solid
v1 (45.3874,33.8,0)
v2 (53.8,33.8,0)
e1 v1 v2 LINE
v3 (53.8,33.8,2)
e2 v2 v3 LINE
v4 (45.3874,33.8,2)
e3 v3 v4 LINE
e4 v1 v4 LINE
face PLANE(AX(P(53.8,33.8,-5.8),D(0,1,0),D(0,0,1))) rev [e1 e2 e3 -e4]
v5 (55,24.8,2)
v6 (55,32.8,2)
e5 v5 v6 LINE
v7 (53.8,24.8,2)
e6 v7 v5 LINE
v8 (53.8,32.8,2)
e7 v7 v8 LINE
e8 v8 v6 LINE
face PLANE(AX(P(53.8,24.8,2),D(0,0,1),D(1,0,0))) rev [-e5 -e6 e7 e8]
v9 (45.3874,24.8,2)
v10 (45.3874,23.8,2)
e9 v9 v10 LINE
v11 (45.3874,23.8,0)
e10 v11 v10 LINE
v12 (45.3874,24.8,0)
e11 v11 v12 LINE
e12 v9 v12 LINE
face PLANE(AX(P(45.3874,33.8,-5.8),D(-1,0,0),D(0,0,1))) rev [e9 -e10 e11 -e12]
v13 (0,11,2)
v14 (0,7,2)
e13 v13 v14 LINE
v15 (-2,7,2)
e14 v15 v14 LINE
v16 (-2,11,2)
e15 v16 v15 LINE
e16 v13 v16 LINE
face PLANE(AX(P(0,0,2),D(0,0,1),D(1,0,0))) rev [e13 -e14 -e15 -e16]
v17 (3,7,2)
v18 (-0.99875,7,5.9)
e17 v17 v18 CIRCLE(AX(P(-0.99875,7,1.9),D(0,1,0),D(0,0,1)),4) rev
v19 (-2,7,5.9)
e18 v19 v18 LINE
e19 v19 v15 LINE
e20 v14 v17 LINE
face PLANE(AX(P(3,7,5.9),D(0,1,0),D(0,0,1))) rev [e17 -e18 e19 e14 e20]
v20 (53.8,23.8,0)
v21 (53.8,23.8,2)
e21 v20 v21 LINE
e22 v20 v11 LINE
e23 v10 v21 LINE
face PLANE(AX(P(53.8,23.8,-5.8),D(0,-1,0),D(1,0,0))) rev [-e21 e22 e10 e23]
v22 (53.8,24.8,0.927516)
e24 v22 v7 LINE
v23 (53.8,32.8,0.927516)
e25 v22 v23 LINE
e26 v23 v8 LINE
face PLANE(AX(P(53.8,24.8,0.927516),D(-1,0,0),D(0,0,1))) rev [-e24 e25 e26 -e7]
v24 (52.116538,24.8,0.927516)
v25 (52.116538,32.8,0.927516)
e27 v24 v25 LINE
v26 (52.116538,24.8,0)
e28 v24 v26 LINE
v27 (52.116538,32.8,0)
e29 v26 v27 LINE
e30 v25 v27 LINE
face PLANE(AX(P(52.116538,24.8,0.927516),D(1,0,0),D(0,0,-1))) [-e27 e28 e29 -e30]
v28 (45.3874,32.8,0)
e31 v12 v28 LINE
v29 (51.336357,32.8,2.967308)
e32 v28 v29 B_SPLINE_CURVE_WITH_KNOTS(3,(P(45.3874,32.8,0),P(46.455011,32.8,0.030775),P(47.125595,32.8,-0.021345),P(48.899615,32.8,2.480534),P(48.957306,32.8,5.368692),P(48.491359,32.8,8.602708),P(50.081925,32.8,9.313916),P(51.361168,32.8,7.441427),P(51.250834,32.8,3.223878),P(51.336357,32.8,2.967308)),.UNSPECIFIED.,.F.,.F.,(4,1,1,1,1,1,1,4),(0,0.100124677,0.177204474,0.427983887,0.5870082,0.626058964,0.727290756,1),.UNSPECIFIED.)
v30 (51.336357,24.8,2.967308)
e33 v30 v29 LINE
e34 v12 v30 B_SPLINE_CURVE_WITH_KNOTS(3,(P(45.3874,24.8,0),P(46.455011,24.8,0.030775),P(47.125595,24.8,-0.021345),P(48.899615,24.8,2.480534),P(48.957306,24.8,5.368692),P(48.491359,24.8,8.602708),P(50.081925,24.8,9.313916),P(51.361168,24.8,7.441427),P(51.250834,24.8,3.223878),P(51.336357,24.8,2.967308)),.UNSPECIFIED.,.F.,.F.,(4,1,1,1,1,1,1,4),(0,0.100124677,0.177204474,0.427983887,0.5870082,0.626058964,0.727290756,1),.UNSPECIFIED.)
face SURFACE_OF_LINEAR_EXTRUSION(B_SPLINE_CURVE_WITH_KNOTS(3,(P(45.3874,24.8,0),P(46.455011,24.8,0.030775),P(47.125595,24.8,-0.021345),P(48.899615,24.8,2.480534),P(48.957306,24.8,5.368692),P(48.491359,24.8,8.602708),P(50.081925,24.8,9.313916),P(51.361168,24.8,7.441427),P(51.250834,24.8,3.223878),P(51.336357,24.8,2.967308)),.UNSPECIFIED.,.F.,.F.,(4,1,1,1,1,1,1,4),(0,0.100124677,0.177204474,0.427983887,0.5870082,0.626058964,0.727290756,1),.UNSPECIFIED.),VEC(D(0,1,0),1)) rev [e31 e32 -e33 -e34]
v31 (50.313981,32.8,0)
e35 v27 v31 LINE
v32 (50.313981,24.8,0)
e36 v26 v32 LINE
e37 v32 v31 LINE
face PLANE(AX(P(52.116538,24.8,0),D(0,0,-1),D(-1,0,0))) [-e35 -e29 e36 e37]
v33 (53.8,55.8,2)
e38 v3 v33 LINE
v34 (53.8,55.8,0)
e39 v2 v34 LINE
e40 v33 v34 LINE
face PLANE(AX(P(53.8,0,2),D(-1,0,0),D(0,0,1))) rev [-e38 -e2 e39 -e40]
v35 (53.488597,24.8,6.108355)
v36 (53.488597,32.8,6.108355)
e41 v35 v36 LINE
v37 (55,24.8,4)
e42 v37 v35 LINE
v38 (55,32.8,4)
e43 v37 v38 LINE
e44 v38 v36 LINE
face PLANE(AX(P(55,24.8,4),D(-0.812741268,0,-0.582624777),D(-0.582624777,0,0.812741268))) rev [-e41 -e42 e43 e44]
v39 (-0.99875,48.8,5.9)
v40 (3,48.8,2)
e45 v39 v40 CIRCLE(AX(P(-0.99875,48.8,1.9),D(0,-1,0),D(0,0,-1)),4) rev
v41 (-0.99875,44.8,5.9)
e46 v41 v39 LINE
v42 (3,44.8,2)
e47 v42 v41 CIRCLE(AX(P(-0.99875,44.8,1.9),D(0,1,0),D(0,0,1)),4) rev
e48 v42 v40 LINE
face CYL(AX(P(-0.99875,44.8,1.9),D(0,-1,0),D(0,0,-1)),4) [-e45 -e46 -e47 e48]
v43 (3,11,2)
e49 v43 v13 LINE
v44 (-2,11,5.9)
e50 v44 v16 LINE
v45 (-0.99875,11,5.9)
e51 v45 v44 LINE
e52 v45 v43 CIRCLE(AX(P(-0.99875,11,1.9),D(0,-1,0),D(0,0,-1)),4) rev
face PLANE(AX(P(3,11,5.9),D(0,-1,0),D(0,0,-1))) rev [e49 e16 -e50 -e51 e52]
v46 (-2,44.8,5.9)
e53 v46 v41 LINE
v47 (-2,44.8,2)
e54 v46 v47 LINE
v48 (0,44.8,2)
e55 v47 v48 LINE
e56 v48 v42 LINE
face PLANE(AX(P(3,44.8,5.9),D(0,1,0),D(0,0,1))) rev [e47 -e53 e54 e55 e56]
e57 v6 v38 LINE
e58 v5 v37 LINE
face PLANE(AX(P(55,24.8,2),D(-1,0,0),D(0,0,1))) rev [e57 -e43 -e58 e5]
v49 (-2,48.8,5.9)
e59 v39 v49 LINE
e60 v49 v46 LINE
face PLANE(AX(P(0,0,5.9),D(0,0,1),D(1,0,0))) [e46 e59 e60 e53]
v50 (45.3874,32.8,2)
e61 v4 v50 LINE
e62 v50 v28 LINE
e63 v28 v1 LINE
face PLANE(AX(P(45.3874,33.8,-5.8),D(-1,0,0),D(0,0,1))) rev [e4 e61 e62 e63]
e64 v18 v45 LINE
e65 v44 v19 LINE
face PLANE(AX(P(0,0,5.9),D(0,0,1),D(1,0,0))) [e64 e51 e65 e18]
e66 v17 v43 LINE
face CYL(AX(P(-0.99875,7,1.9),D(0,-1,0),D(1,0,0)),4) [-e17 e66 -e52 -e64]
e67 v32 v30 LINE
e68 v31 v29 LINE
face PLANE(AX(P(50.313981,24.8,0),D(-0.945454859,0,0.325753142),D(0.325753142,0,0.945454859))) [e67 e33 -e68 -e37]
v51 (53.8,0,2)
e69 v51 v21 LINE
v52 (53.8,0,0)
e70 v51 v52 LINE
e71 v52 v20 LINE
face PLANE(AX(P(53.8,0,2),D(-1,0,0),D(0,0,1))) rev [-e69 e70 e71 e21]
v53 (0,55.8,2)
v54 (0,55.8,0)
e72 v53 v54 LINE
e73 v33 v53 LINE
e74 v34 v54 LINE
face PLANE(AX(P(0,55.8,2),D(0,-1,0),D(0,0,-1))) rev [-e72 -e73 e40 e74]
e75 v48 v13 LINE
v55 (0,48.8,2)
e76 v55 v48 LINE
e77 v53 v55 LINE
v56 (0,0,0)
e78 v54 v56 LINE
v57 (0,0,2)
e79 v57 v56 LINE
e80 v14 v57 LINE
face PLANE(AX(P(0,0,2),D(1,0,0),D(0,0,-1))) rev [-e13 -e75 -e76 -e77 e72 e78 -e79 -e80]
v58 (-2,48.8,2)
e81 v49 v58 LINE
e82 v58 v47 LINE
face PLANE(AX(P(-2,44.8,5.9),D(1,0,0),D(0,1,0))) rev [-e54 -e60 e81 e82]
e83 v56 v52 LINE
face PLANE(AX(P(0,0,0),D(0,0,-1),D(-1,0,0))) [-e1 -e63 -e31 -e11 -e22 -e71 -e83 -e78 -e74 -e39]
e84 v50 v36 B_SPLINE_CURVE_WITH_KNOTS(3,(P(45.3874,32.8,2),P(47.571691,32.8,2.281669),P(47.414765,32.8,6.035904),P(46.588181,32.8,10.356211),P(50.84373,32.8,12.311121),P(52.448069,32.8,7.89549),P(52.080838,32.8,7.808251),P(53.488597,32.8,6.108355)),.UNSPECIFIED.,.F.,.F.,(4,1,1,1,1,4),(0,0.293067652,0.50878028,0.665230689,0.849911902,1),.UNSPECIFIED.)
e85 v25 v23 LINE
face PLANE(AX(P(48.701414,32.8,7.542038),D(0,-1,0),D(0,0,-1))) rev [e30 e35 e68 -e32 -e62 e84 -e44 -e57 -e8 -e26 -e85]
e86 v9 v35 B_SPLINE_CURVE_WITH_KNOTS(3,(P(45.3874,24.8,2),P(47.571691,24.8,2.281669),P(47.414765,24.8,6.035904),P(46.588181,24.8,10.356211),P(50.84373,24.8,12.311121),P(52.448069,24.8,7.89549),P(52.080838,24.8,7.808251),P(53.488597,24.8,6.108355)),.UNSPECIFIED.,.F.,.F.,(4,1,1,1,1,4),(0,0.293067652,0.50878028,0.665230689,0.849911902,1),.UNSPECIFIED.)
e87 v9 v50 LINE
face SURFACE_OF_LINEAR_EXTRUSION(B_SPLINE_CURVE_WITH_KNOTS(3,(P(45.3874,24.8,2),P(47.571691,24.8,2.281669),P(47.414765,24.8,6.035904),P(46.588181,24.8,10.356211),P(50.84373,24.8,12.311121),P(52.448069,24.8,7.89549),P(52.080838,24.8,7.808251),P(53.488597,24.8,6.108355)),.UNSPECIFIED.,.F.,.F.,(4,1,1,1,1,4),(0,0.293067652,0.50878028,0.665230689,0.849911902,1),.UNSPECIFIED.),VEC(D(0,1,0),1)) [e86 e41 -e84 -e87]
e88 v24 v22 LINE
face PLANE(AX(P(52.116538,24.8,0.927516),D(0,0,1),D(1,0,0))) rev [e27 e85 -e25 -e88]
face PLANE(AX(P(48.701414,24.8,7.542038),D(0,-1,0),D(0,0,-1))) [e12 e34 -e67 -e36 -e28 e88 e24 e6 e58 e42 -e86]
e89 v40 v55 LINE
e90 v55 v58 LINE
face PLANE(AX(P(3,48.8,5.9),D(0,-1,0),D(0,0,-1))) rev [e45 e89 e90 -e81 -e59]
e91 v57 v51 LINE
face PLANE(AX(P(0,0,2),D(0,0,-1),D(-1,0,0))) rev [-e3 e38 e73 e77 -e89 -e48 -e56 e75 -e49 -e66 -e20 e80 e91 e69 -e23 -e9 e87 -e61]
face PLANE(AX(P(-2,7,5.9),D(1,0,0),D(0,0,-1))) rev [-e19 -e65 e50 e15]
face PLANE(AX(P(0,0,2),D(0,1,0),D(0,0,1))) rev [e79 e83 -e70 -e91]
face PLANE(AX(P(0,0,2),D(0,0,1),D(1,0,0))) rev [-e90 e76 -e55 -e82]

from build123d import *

# Parameters (mm, degrees)
ESQUISSE1_W             = 53.8
ESQUISSE1_H             = 55.8
BOSS_EXTRU_1_DEPTH      = 2
ESQUISSE3_W             = 5
ESQUISSE3_H             = 4
BOSS_EXTRU_2_DEPTH      = 3.9
CONG_1_R                = 4
ESQUISSE4_W             = 8.412600453
ESQUISSE4_H             = 10
ENL_V_MAT_EXTRU_1_DEPTH = 7.8
BOSS_EXTRU_3_START      = 1
BOSS_EXTRU_3_DEPTH      = 8


with BuildPart() as part:
    # Esquisse1 → Boss.-Extru.1 (new body)
    with BuildSketch(Plane.XY):
        with Locations((26.9, 27.9)):
            Rectangle(ESQUISSE1_W, ESQUISSE1_H)
    extrude(amount=BOSS_EXTRU_1_DEPTH)

    # Esquisse3 → Boss.-Extru.2 (add)
    with BuildSketch(Plane.XY.offset(2)):
        with Locations((0.5, 9)):
            Rectangle(ESQUISSE3_W, ESQUISSE3_H)
        with Locations((0.5, 46.8)):
            Rectangle(ESQUISSE3_W, ESQUISSE3_H)
    extrude(amount=BOSS_EXTRU_2_DEPTH)

    # Congé1
    # the kernel refuses this fillet: 4 mm, written as the material it takes off along each edge
    with BuildSketch(Plane(origin=(3, 58.796874512, 5.9), x_dir=(0, 0, -1), z_dir=(0, -1, 0)), Plane(origin=(3, 20.996874512, 5.9), x_dir=(0, 0, -1), z_dir=(0, -1, 0))) as cong_1_piece_1:
        with BuildLine():
            CenterArc((4, -3.998749805), CONG_1_R, 91.432543738, 88.567456262)
            Line((0, -3.998749805), (-0.08, -3.998749805))
            Line((-0.08, -3.998749805), (-0.08, 0))
            Line((-0.08, 0), (0, 0.08))
            ThreePointArc((0, 0.08), (1.95, 0.08), (3.898, 0.079974996))
            Line((3.898, 0.079974996), (3.9, 0))
        make_face()
    extrude(amount=23.993749023, mode=Mode.SUBTRACT)

    # Esquisse4 → Enlèv. mat.-Extru.1 (cut)
    with BuildSketch(Plane.XY.offset(2)):
        with Locations((49.593699774, 28.8)):
            Rectangle(ESQUISSE4_W, ESQUISSE4_H)
    extrude(amount=-ENL_V_MAT_EXTRU_1_DEPTH, mode=Mode.SUBTRACT)

    # Esquisse5 → Boss.-Extru.3 (add)
    with BuildSketch(Plane.XZ.offset(-33.8).offset(BOSS_EXTRU_3_START)):
        with BuildLine():
            Line((52.116537942, 0.927515673), (52.116537942, 0))
            Line((52.116537942, 0), (50.313981281, 0))
            Line((50.313981281, 0), (51.336356936, 2.967308385))
            add(Edge.make_bspline(
                [(45.387399547, 0), (46.455010673, 0.030774957), (47.125595065, -0.021344745), (48.899614795, 2.480533697), (48.957306387, 5.368692409), (48.491359116, 8.602707598), (50.081924854, 9.3139155), (51.361168313, 7.44142707), (51.2508337, 3.223878094), (51.336356936, 2.967308385)],
                knots=[0, 0, 0, 0, 0.100124677, 0.177204474, 0.427983887, 0.5870082, 0.626058964, 0.727290756, 1, 1, 1, 1], degree=3))
            Line((45.387399547, 0), (45.387399547, 2))
            add(Edge.make_bspline(
                [(45.387399547, 2), (47.571691044, 2.281668527), (47.414765021, 6.03590405), (46.588181158, 10.356210638), (50.843729596, 12.311121356), (52.448069251, 7.895489544), (52.08083827, 7.808250706), (53.488596921, 6.108354647)],
                knots=[0, 0, 0, 0, 0.293067652, 0.50878028, 0.665230689, 0.849911902, 1, 1, 1, 1], degree=3))
            Line((53.488596921, 6.108354647), (55, 4))
            Line((55, 4), (55, 2))
            Line((55, 2), (53.8, 2))
            Line((53.8, 2), (53.8, 0.927515673))
            Line((53.8, 0.927515673), (52.116537942, 0.927515673))
        make_face()
    extrude(amount=BOSS_EXTRU_3_DEPTH)


solid = part.part
